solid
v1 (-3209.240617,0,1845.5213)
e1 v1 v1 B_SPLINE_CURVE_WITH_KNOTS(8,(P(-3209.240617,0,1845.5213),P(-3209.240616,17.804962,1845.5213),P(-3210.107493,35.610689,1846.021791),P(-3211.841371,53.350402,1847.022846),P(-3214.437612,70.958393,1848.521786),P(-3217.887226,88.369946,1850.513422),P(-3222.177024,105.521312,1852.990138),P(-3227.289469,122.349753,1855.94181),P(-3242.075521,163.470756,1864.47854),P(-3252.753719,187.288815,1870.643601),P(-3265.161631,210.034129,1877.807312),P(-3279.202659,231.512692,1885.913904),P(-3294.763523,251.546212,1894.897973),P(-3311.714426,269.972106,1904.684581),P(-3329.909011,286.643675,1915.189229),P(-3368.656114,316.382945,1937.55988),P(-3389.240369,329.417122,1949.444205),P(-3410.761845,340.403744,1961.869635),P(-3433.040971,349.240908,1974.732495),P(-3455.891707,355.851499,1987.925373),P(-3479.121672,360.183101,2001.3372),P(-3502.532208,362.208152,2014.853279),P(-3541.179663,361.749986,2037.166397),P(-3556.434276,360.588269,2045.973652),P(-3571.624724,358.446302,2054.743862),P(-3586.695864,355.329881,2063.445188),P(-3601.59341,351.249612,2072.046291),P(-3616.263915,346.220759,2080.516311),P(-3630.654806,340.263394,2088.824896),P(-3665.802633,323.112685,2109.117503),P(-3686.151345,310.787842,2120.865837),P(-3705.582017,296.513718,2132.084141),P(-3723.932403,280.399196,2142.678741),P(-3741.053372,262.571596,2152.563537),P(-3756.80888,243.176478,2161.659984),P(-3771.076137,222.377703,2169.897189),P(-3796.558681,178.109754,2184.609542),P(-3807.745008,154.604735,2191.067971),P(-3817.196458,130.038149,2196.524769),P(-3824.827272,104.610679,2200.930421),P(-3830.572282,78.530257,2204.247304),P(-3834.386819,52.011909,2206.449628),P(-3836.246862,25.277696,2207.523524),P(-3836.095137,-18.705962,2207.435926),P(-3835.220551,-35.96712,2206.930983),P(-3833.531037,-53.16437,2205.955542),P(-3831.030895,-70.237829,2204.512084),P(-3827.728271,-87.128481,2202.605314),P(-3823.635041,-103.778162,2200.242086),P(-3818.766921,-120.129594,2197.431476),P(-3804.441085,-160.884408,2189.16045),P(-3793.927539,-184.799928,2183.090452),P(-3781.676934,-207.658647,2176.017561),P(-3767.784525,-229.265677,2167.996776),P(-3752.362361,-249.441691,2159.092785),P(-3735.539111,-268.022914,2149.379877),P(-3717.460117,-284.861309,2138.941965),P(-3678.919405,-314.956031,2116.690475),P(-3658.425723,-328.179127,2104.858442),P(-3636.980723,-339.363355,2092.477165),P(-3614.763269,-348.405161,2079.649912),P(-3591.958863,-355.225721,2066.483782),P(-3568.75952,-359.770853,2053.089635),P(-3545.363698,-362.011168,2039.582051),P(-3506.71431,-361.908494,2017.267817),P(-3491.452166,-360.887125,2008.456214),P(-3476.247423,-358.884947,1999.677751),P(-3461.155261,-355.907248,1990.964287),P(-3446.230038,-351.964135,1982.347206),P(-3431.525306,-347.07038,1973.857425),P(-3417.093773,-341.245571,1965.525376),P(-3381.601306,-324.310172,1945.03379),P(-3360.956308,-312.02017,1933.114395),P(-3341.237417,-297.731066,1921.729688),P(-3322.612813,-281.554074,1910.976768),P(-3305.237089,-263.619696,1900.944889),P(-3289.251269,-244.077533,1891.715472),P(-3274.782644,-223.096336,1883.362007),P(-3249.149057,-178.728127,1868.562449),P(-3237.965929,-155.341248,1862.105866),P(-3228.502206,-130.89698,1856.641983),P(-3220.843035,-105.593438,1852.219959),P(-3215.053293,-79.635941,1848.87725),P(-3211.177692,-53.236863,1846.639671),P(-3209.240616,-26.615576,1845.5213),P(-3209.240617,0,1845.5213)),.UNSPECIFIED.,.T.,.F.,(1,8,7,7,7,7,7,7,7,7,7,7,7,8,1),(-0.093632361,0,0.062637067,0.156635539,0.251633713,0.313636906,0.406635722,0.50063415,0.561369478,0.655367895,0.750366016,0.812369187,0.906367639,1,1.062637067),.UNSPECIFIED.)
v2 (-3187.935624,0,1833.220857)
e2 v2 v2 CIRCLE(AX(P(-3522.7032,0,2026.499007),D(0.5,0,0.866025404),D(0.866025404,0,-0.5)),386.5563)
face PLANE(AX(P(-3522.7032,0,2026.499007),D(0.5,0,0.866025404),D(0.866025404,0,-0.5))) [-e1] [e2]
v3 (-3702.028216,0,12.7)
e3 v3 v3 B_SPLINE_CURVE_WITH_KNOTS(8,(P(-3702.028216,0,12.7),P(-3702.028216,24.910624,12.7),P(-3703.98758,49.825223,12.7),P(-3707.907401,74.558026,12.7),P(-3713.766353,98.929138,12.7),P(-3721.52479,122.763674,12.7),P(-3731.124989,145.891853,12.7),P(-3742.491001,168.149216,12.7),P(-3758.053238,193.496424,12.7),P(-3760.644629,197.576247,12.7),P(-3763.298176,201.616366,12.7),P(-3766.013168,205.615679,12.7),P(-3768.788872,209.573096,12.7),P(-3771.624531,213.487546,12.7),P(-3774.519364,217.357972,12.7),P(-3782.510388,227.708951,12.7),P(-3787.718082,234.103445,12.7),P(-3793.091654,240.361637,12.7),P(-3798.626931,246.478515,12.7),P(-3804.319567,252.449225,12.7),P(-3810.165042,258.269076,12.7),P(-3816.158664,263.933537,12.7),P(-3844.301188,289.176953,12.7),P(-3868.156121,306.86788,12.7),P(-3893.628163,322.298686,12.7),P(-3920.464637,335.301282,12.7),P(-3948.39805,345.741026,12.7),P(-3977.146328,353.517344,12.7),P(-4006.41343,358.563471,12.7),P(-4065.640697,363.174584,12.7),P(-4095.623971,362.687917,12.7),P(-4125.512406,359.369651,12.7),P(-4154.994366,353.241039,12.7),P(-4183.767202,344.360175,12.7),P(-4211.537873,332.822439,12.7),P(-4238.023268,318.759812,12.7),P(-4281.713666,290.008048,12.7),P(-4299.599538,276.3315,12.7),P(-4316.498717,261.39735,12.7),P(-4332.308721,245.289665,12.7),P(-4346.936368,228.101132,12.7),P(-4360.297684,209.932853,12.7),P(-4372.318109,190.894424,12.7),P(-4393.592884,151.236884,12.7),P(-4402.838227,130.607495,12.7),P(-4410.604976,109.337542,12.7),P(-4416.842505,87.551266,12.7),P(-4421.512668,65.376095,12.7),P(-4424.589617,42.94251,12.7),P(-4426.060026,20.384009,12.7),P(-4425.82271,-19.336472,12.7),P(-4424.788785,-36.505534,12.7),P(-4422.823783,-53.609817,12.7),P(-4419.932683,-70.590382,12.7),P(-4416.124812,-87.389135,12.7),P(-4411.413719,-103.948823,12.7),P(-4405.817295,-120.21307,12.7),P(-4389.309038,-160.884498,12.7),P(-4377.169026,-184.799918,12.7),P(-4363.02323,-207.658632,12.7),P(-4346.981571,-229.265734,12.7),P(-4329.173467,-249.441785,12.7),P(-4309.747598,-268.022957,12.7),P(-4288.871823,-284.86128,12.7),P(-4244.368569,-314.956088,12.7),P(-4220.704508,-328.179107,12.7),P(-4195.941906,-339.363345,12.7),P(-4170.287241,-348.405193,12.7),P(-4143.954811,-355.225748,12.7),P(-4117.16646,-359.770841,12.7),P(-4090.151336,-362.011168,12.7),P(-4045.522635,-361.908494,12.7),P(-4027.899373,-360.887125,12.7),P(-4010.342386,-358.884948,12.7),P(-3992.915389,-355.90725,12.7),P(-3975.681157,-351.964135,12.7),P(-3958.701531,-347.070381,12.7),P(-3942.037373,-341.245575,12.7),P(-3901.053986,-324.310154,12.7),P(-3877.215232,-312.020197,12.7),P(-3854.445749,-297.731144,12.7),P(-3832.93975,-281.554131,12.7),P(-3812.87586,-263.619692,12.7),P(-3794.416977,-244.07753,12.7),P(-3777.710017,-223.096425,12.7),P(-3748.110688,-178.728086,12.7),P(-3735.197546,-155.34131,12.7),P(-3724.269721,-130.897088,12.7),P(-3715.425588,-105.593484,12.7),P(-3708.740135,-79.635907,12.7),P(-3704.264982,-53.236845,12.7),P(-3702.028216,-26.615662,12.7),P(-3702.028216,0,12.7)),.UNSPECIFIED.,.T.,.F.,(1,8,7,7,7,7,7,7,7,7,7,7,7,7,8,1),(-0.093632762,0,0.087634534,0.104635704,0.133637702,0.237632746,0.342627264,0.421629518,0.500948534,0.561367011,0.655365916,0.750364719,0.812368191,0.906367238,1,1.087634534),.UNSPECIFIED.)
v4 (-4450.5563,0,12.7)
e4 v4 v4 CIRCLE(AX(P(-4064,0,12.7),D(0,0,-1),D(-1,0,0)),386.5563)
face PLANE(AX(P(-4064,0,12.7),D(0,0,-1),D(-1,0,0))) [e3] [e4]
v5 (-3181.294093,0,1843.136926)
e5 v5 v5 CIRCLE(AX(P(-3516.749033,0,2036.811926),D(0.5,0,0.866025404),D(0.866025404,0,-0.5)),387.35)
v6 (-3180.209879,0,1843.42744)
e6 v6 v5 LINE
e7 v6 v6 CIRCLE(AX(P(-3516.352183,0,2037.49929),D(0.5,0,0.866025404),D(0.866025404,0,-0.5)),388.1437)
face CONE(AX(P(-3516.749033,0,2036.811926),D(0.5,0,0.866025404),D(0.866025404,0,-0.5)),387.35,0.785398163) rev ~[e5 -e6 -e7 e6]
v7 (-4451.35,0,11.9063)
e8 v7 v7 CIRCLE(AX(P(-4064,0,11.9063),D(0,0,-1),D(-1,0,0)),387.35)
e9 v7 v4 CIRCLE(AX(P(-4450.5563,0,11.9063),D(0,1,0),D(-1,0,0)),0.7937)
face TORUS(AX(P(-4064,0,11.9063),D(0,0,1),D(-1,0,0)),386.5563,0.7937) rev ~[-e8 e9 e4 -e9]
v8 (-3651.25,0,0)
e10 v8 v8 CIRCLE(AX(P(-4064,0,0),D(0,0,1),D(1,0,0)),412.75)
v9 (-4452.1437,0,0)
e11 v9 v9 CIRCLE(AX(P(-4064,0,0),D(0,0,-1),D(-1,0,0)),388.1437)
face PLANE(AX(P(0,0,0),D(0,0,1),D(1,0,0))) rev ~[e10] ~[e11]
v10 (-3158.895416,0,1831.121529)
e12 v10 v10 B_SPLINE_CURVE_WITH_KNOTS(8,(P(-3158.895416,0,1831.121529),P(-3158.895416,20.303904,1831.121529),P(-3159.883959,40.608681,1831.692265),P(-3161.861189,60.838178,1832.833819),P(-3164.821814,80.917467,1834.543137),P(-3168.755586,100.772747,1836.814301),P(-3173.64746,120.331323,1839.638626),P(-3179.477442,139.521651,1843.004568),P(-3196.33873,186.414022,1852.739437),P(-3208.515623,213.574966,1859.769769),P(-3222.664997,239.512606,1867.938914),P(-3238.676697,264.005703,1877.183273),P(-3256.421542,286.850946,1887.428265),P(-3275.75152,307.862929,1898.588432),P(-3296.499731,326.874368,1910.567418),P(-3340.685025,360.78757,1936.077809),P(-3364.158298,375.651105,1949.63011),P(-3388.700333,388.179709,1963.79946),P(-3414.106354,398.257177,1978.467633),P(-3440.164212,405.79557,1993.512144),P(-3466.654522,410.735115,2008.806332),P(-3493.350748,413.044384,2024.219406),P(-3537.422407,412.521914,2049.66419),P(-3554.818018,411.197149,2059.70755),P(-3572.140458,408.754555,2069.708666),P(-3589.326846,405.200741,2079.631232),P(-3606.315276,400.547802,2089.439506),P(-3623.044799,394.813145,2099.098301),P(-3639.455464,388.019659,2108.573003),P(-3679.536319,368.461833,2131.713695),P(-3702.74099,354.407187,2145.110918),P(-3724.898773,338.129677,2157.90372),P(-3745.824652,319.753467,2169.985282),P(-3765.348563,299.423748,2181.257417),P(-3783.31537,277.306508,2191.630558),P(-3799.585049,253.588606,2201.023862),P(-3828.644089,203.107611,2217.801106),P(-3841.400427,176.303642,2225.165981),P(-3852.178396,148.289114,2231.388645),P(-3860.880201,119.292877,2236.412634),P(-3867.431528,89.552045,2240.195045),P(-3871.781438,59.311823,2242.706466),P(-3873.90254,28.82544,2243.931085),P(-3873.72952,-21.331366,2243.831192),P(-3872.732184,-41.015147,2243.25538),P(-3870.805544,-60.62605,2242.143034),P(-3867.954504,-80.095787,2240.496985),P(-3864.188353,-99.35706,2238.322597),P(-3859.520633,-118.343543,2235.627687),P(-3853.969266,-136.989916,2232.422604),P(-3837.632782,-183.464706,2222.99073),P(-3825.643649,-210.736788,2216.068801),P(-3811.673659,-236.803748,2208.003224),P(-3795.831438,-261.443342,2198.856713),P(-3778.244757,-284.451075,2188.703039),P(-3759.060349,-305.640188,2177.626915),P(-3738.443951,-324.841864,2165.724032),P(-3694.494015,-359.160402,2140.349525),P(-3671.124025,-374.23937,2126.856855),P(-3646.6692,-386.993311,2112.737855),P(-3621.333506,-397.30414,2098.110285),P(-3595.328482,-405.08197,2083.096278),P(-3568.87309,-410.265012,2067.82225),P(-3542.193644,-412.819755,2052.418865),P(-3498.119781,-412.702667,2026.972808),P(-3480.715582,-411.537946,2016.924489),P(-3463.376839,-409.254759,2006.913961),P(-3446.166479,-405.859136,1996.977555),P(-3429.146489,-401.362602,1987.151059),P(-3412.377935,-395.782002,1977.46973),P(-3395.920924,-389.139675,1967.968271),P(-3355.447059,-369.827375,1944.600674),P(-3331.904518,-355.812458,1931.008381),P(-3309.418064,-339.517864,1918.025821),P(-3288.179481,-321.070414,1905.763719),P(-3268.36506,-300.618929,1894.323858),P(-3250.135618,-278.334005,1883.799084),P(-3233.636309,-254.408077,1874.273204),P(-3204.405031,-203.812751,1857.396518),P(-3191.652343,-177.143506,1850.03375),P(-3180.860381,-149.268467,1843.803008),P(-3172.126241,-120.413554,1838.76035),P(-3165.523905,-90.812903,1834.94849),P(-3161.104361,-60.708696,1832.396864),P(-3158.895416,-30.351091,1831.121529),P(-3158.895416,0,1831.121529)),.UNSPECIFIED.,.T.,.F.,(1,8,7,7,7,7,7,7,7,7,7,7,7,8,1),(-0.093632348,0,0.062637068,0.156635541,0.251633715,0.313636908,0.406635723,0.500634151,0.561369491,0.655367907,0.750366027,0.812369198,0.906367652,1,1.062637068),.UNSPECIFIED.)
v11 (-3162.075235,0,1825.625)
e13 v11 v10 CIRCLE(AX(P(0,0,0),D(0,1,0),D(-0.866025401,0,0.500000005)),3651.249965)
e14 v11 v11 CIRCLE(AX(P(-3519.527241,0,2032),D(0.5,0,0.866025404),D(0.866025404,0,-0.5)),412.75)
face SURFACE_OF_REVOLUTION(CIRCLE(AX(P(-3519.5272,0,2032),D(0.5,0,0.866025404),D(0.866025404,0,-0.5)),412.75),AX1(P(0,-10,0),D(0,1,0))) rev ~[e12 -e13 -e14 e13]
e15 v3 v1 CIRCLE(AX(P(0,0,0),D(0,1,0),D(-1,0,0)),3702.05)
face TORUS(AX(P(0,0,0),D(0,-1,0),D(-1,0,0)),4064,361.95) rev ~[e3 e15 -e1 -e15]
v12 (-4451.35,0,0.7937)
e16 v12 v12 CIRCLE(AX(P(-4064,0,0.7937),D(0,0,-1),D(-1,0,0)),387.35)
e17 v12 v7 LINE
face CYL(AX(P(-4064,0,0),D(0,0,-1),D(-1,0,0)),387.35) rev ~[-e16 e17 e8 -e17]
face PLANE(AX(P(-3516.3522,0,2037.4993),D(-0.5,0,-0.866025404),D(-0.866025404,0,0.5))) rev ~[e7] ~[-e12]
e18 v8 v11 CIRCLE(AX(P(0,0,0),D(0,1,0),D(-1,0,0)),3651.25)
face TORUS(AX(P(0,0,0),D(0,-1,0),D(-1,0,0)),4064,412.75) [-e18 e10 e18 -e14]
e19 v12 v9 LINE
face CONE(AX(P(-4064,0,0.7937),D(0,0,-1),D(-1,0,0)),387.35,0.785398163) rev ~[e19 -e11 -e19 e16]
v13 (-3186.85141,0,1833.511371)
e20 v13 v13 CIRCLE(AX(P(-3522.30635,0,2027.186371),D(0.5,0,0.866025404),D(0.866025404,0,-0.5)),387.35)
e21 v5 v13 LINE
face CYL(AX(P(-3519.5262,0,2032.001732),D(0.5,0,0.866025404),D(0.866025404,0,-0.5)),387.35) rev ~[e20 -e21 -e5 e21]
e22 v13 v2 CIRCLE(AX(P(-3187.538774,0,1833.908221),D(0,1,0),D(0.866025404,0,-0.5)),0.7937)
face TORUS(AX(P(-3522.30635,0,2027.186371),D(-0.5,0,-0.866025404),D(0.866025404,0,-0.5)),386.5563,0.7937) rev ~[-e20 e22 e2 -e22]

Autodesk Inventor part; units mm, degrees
ref_plane "YZ Plane" through (0, 0, 0) normal (1, 0, 0) x (0, 1, 0)
ref_plane "XZ Plane" through (0, 0, 0) normal (0, 1, 0) x (-1, 0, 0)
ref_plane "XY Plane" through (0, 0, 0) normal (0, 0, 1) x (1, 0, 0)
sketch "Sketch1" plane through (0, 0, 0) normal (0, 0, 1) x (1, 0, 0)
  circle A0 centre (-4064, 0) radius 361.95
  circle A1 centre (-4064, 0) radius 412.75
  line L0 (0, -577.85) -> (0, 577.85) projected
  point P0 (0, 0)
  dimension "d0" = 723.9
  dimension "d1" = 825.5
  dimension "d2" = 4064
revolve "Revolution1" add sketch "Sketch1" angle 30 about axis through (0, -10, 0) along (0, 1, 0)
sketch "Sketch10" plane through (-4064, 0, 0) normal (0, 0, -1) x (-1, 0, 0)
  circle A0 centre (0, 0) radius 387.35
  circle A1 centre (0, 0) radius 412.75 construction
  point P0 (-4064, 0)
  dimension "d34" = 774.7
extrude "Extrusion9" cut sketch "Sketch10" against normal blind 12.7
sketch "Sketch11" plane through (-3519.5272, 0, 2032) normal (0.5, 0, 0.8660254) x (0.8660254, 0, -0.5)
  circle A0 centre (0, 0) radius 387.35
  line L0 (4064, -577.85) -> (4064, 577.85) projected
  circle A1 centre (0, 0) radius 412.75 projected
  point P0 (4064, 0)
  dimension "d37" = 774.7
revolve "Revolution3" add sketch "Sketch11" angle 0.5 about axis through (0, -10, 0) along (0, 1, 0) contours A0 | A1
extrude "Extrusion10" cut sketch "Sketch11" against normal blind 6.35 contours A0
extrude "Extrusion12" cut sketch "Sketch11" along normal blind 6.35 contours A0
sketch "Sketch12" plane through (-3516.3522, 0, 2037.4993) normal (-0.5, 0, -0.8660254) x (-0.8660254, 0, 0.5)
  circle A0 centre (0, 0) radius 387.35 construction
  circle A1 centre (0, 0) radius 463.55
  point P0 (-4064, 0)
  dimension "d52" = 927.1
extrude "Extrusion13" cut sketch "Sketch12" against normal through all
fillet "Fillet3" radius 0.7937 2 edges at (-3858.1582, 0, 2220.174) (-3676.65, 0, 12.7)
chamfer "Chamfer3" distance 0.7937 angle 45 2 edges at (-3851.8072, 0, 2231.1743) (-3676.65, 0, 0)
properties part number "A1-19027-100-05 HCWI elbow - female" material "Iron, HCWI"
